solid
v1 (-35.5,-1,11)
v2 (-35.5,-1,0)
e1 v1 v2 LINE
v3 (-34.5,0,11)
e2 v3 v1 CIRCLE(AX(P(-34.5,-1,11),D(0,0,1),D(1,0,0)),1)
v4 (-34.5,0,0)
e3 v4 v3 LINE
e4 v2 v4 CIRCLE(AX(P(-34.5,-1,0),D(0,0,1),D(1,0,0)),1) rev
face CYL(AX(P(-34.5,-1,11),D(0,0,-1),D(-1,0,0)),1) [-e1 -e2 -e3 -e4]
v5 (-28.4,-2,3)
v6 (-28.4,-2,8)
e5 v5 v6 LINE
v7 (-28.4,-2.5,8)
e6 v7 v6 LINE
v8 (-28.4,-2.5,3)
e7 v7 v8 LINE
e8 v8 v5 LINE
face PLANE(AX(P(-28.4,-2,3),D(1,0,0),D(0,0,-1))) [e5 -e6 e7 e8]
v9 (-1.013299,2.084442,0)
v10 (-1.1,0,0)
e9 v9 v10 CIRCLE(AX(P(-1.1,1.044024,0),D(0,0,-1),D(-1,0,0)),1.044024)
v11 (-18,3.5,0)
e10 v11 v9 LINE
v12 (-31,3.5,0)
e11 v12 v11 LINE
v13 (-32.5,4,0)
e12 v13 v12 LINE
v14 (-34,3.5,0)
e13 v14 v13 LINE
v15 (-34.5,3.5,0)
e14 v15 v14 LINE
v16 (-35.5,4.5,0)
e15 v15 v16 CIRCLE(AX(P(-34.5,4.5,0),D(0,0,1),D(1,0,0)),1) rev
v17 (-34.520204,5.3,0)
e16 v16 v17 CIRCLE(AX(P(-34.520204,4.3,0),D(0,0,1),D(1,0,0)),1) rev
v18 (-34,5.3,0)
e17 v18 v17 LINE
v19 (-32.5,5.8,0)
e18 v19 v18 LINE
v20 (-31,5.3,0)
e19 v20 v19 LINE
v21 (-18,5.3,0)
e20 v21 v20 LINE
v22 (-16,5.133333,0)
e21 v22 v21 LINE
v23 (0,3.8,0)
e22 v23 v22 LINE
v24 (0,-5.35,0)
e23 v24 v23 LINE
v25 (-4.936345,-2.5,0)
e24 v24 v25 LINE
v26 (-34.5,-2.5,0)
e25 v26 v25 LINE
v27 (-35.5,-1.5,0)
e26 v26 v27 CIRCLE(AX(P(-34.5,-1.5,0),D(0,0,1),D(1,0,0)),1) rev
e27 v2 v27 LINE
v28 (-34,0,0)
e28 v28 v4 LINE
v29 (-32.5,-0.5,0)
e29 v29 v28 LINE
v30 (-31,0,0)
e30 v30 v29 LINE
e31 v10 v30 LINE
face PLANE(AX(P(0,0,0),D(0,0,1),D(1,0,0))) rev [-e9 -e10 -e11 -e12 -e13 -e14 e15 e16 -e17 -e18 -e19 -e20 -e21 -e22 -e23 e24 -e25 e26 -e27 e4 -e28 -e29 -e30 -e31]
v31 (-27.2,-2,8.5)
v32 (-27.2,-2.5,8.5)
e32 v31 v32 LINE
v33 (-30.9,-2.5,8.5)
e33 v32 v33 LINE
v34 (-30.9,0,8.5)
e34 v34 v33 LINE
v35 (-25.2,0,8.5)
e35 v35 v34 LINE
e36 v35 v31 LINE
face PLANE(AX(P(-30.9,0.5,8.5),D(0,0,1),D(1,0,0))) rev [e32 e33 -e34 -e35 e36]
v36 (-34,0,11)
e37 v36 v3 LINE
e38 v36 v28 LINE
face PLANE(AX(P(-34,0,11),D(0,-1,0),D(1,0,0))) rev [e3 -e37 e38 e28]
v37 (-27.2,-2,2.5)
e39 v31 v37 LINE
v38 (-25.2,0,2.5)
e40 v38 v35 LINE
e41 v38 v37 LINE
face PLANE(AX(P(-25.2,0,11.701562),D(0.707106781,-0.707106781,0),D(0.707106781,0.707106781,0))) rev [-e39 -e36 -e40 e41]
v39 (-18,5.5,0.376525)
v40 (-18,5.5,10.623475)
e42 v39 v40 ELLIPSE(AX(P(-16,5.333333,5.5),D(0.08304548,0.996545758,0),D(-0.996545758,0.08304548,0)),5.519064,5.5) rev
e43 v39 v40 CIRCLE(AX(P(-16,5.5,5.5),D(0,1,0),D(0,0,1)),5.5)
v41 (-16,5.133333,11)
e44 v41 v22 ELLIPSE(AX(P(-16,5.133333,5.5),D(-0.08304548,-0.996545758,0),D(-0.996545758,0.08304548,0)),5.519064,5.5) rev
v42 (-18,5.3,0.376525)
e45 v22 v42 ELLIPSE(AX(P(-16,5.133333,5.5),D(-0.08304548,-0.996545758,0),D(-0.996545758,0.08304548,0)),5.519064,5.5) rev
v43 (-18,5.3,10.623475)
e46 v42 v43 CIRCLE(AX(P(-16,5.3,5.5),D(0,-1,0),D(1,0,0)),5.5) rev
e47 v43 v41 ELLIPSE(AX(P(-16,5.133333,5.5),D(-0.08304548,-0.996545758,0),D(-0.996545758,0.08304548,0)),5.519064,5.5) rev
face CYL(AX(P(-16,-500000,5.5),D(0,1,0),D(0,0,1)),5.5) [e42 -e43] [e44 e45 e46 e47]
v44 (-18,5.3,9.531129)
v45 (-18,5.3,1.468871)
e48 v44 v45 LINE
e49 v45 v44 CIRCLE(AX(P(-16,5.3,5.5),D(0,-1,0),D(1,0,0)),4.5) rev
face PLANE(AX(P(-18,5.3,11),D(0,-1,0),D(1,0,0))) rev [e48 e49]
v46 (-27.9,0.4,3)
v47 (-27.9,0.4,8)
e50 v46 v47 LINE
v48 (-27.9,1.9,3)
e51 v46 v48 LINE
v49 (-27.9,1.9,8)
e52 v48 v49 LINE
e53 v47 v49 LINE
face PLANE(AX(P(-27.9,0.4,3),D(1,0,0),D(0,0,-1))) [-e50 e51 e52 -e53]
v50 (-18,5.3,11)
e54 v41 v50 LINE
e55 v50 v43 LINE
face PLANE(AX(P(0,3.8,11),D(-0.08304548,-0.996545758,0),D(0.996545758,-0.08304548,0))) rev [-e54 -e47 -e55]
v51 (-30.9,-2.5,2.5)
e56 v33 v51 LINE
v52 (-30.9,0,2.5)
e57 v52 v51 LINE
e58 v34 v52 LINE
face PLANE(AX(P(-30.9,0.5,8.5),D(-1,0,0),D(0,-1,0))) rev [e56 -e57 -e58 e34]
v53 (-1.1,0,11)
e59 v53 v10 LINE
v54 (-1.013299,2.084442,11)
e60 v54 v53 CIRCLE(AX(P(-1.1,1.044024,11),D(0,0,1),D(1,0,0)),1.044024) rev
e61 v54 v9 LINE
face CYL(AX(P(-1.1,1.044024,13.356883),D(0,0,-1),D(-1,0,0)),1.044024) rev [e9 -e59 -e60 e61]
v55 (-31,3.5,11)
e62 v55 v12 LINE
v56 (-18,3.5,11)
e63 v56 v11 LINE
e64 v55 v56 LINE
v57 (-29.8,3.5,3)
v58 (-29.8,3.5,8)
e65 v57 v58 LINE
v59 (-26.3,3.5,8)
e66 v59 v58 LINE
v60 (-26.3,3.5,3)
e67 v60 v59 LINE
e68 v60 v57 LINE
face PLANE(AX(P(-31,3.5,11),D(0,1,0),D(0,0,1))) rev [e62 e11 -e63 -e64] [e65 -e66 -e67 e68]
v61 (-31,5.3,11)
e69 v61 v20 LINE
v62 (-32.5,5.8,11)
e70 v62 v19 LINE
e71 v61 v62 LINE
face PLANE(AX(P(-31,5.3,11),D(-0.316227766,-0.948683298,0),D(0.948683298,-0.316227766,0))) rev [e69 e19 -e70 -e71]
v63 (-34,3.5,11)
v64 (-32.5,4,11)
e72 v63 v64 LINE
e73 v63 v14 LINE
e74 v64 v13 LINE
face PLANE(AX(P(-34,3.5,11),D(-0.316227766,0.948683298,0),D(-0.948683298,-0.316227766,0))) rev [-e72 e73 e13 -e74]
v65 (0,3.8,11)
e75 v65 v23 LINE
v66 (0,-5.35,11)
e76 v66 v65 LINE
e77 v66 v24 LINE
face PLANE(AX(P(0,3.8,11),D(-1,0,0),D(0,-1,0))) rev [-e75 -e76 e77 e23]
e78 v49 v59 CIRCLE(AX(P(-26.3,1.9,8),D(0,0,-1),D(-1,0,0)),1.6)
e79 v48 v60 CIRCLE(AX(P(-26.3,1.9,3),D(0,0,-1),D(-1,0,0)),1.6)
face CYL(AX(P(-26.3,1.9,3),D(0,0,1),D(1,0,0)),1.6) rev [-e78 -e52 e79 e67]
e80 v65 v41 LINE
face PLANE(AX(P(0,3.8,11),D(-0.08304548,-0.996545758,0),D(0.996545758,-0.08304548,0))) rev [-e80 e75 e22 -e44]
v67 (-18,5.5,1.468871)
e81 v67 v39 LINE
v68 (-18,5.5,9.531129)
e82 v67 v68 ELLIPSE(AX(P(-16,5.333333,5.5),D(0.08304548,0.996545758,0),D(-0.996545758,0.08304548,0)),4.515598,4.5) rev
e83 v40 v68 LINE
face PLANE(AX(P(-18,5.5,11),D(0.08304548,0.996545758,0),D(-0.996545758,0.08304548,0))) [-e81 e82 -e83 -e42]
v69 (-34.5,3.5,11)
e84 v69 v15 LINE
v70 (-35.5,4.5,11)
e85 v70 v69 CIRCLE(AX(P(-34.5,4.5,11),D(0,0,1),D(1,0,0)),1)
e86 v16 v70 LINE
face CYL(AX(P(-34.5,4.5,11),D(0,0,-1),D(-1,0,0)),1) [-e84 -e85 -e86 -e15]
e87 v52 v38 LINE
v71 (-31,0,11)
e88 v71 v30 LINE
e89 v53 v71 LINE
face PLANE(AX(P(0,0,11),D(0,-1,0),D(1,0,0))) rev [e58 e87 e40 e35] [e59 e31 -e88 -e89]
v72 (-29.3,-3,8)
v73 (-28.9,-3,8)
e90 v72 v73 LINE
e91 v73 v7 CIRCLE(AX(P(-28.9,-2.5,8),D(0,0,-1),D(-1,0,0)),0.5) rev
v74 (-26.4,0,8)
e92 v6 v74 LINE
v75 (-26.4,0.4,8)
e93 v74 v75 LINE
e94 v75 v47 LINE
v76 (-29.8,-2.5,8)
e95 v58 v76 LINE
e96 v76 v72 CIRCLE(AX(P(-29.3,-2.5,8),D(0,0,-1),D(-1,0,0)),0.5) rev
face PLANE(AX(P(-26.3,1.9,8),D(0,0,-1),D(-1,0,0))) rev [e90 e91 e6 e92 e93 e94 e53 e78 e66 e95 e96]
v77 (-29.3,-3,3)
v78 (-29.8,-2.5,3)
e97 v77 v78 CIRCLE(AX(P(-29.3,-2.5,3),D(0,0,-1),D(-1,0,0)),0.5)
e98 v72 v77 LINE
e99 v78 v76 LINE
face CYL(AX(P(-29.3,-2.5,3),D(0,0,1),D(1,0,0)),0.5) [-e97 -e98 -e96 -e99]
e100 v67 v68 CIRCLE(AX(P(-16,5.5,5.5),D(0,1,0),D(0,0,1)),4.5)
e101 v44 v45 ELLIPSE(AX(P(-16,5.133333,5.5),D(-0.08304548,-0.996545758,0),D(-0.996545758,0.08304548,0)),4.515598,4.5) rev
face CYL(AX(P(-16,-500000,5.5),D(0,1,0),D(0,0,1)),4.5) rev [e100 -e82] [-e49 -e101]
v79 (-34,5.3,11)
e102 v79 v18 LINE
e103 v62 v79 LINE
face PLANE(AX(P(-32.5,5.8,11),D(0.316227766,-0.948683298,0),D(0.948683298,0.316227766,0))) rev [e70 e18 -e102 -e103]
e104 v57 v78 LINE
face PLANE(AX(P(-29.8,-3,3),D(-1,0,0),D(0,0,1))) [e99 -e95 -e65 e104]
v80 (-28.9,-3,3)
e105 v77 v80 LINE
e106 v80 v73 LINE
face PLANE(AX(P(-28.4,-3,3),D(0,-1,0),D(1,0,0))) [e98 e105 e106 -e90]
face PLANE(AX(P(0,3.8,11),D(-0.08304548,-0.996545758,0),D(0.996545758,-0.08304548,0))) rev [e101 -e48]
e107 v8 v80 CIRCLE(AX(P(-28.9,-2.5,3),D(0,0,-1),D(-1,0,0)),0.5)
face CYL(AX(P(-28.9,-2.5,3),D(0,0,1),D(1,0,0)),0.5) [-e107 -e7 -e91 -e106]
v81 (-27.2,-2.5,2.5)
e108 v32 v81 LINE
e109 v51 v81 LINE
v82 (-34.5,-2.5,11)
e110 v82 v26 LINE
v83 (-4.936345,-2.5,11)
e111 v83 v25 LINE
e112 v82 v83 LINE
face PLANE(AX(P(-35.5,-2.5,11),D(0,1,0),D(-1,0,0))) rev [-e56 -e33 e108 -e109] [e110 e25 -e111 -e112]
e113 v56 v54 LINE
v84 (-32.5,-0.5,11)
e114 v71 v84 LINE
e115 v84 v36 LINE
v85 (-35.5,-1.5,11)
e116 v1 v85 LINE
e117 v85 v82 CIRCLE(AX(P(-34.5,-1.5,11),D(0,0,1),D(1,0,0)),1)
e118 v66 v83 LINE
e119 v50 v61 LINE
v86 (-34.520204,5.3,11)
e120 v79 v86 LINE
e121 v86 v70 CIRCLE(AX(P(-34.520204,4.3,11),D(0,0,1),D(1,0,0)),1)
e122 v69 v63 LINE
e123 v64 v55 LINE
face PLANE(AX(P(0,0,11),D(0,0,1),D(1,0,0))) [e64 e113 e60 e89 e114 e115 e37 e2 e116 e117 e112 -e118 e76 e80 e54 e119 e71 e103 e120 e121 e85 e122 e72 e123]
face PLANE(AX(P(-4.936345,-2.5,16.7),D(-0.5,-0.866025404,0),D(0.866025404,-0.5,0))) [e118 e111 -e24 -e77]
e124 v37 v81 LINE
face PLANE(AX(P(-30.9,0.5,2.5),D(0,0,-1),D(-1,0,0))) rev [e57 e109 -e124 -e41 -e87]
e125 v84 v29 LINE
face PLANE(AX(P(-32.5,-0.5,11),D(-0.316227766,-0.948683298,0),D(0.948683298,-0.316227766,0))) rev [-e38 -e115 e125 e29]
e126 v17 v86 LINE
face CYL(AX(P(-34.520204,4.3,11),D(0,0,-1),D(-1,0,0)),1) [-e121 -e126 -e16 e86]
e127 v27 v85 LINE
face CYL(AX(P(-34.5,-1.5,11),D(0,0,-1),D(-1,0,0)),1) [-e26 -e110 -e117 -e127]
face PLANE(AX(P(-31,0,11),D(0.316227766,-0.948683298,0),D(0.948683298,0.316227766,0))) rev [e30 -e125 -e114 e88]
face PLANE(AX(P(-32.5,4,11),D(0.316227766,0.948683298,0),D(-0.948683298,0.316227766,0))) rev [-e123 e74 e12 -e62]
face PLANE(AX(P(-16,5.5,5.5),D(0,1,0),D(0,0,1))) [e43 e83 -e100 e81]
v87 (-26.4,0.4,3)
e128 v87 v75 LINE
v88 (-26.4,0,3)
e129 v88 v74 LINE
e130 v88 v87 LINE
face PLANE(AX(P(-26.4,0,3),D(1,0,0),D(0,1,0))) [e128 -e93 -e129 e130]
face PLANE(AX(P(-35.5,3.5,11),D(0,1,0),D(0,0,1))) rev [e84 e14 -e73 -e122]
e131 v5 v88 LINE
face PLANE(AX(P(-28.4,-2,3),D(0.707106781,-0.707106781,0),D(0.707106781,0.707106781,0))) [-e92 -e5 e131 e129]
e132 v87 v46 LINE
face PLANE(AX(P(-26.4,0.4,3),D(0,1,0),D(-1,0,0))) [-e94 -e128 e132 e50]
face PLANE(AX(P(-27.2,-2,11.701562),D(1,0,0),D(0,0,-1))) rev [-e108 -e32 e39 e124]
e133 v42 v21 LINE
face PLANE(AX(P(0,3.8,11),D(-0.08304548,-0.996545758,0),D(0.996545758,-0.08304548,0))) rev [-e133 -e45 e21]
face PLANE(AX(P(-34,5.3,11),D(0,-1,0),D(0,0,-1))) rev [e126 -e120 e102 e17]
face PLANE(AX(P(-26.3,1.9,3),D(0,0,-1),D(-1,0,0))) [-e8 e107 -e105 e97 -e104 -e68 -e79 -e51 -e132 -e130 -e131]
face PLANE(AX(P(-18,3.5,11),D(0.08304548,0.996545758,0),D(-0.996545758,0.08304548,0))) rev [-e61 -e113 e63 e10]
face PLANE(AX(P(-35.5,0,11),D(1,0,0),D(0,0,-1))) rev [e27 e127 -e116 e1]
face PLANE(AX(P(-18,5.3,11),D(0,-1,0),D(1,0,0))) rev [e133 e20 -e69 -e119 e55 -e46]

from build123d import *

# Parameters (mm, degrees)
BOSS_EXTRUDE1_DEPTH   = 11
BOSS_EXTRUDE1_2_DEPTH = 11
SKETCH2_W             = 5.7
SKETCH2_H             = 6
CUT_EXTRUDE1_DEPTH    = 3
BOSS_EXTRUDE8_DEPTH   = 11
BOSS_EXTRUDE2_DEPTH   = 6
BOSS_EXTRUDE3_START   = -5.5
BOSS_EXTRUDE3_DEPTH   = 2.5
FILLET7_R             = 1
FILLET8_R             = 1
FILLET10_R            = 1
FILLET11_R            = 1
FILLET12_R            = 0.5
BOSS_EXTRUDE7_REACH   = 45.115
BOSS_EXTRUDE7_START   = 5.5
SKETCH6_R             = 5.5
SKETCH6_R_2           = 4.5
CUT_EXTRUDE3_DEPTH    = 38.615023594
BOSS_EXTRUDE9_DEPTH   = 11


with BuildPart() as part:
    # Sketch1 → Boss-Extrude1 (new body)
    with BuildSketch(Plane.XY):
        Polygon((0, 3.8), (0, 2), (-18, 3.5), (-31, 3.5), (-32.5, 4), (-34, 3.5), (-35.5, 3.5), (-35.5, 5.3), (-34, 5.3), (-32.5, 5.8), (-31, 5.3), (-18, 5.3), align=None)
    extrude(amount=BOSS_EXTRUDE1_DEPTH)



with BuildPart() as body_2:
    # Sketch1 → Boss-Extrude1 2 (new body)
    with BuildSketch(Plane.XY):
        Polygon((0, 0), (0, -2.5), (-35.5, -2.5), (-35.5, 0), (-34, 0), (-32.5, -0.5), (-31, 0), align=None)
    extrude(amount=BOSS_EXTRUDE1_2_DEPTH)

    # Sketch2 → Cut-Extrude1 (cut)
    with BuildSketch(Plane.XZ.offset(2.5)):
        with Locations((-28.05, 5.5)):
            Rectangle(SKETCH2_W, SKETCH2_H)
    extrude(amount=-CUT_EXTRUDE1_DEPTH, mode=Mode.SUBTRACT)


with BuildPart() as part_1:
    add(part.part)

    add(body_2.part)  # Boss-Extrude8 merges body 2
    # Sketch8 → Boss-Extrude8 (add)
    with BuildSketch(Plane(origin=(0, 0, 0), x_dir=(-1, 0, 0), z_dir=(0, 0, -1))):
        with BuildLine():
            Line((1.013298532, 2.084441544), (0, 2))
            Line((0, 2), (0, 0))
            Line((0, 0), (1.1, 0))
            ThreePointArc((1.1, 0), (0.05687804, 1.000635709), (1.013298532, 2.084441544))
        make_face()
    extrude(amount=-BOSS_EXTRUDE8_DEPTH)

    # Sketch3 → Boss-Extrude2 (add)
    with BuildSketch(Plane.XY.offset(2.5)):
        Polygon((-25.2, 0), (-27.2, -2), (-27.2, -2.5), (-25.2, -2.5), align=None)
    extrude(amount=BOSS_EXTRUDE2_DEPTH)

    # Sketch4 → Boss-Extrude3 (add, symmetric)
    with BuildSketch(Plane.XY.offset(11).offset(BOSS_EXTRUDE3_START)):
        with BuildLine():
            Line((-28.4, -2), (-26.4, 0))
            Line((-26.4, 0), (-26.4, 0.4))
            Line((-26.4, 0.4), (-27.9, 0.4))
            Line((-27.9, 0.4), (-27.9, 1.9))
            ThreePointArc((-27.9, 1.9), (-27.43137085, 3.03137085), (-26.3, 3.5))
            Line((-26.3, 3.5), (-29.8, 3.5))
            Line((-29.8, 3.5), (-29.8, -3))
            Line((-29.8, -3), (-28.4, -3))
            Line((-28.4, -3), (-28.4, -2))
        make_face()
    extrude(amount=BOSS_EXTRUDE3_DEPTH, both=True)

    # Fillet7
    fillet7_edges = [part_1.edges().sort_by_distance(p)[0] for p in [
        (-35.5, 0, 5.5),
    ]]
    fillet(fillet7_edges, radius=FILLET7_R)

    # Fillet8
    fillet8_edges = [part_1.edges().sort_by_distance(p)[0] for p in [
        (-35.5, 3.5, 5.5),
    ]]
    fillet(fillet8_edges, radius=FILLET8_R)

    # Fillet10
    # the kernel refuses this fillet: 1 mm, written as the material it takes off along each edge
    with BuildSketch(Plane(origin=(-35.5, 5.3, -2.449489743), x_dir=(1.6076029396566988e-12, -1.0, 0), z_dir=(0, 0, 1))) as fillet10_piece_1:
        with BuildLine():
            CenterArc((1, 0.979795897), FILLET10_R, 180, 78.463040967)
            Line((0, 0.979795897), (-0.02, 0.979795897))
            Line((-0.02, 0.979795897), (-0.02, 0))
            Line((-0.02, 0), (0, -0.02))
            ThreePointArc((0, -0.02), (0.4, -0.02), (0.796, -0.019595918))
            Line((0.796, -0.019595918), (0.8, 0))
        make_face()
    extrude(amount=15.898979486, mode=Mode.SUBTRACT)

    # Fillet11
    fillet11_edges = [part_1.edges().sort_by_distance(p)[0] for p in [
        (-35.5, -2.5, 5.5),
    ]]
    fillet(fillet11_edges, radius=FILLET11_R)

    # Fillet12
    fillet12_edges = [part_1.edges().sort_by_distance(p)[0] for p in [
        (-28.4, -3, 5.5),
        (-29.8, -3, 5.5),
    ]]
    fillet(fillet12_edges, radius=FILLET12_R)

    # Sketch6 → Boss-Extrude7 (add, up to next)
    with BuildSketch(Plane(origin=(0, 0, 0), x_dir=(1, 0, 0), z_dir=(0, 1, 0)).offset(BOSS_EXTRUDE7_START), mode=Mode.PRIVATE) as boss_extrude7_sk1:
        with Locations(Location((-16, -5.5, 0), (0, 0, 270))):
            Circle(SKETCH6_R)
        with Locations(Location((-16, -5.5, 0), (0, 0, 270))):
            Circle(SKETCH6_R_2, mode=Mode.SUBTRACT)
    boss_extrude7_tool1 = extrude(boss_extrude7_sk1.sketch, amount=-BOSS_EXTRUDE7_REACH, mode=Mode.PRIVATE) - part_1.part
    add(boss_extrude7_tool1.solids().sort_by_distance((-16, 5.5, 0.155563))[0])

    # Sketch7 → Cut-Extrude3 (cut, through all)
    with BuildSketch(Plane.XY):
        Polygon((-18, 5.5), (-8, 4.666666667), (-8, 5.5), align=None)
    extrude(amount=CUT_EXTRUDE3_DEPTH, mode=Mode.SUBTRACT)

    # Sketch10 → Boss-Extrude9 (add)
    with BuildSketch(Plane(origin=(0, 0, 0), x_dir=(-1, 0, 0), z_dir=(0, 0, -1))):
        Polygon((0, -2.5), (4.936344802, -2.5), (0, -5.35), align=None)
    extrude(amount=-BOSS_EXTRUDE9_DEPTH)


solid = part_1.part
